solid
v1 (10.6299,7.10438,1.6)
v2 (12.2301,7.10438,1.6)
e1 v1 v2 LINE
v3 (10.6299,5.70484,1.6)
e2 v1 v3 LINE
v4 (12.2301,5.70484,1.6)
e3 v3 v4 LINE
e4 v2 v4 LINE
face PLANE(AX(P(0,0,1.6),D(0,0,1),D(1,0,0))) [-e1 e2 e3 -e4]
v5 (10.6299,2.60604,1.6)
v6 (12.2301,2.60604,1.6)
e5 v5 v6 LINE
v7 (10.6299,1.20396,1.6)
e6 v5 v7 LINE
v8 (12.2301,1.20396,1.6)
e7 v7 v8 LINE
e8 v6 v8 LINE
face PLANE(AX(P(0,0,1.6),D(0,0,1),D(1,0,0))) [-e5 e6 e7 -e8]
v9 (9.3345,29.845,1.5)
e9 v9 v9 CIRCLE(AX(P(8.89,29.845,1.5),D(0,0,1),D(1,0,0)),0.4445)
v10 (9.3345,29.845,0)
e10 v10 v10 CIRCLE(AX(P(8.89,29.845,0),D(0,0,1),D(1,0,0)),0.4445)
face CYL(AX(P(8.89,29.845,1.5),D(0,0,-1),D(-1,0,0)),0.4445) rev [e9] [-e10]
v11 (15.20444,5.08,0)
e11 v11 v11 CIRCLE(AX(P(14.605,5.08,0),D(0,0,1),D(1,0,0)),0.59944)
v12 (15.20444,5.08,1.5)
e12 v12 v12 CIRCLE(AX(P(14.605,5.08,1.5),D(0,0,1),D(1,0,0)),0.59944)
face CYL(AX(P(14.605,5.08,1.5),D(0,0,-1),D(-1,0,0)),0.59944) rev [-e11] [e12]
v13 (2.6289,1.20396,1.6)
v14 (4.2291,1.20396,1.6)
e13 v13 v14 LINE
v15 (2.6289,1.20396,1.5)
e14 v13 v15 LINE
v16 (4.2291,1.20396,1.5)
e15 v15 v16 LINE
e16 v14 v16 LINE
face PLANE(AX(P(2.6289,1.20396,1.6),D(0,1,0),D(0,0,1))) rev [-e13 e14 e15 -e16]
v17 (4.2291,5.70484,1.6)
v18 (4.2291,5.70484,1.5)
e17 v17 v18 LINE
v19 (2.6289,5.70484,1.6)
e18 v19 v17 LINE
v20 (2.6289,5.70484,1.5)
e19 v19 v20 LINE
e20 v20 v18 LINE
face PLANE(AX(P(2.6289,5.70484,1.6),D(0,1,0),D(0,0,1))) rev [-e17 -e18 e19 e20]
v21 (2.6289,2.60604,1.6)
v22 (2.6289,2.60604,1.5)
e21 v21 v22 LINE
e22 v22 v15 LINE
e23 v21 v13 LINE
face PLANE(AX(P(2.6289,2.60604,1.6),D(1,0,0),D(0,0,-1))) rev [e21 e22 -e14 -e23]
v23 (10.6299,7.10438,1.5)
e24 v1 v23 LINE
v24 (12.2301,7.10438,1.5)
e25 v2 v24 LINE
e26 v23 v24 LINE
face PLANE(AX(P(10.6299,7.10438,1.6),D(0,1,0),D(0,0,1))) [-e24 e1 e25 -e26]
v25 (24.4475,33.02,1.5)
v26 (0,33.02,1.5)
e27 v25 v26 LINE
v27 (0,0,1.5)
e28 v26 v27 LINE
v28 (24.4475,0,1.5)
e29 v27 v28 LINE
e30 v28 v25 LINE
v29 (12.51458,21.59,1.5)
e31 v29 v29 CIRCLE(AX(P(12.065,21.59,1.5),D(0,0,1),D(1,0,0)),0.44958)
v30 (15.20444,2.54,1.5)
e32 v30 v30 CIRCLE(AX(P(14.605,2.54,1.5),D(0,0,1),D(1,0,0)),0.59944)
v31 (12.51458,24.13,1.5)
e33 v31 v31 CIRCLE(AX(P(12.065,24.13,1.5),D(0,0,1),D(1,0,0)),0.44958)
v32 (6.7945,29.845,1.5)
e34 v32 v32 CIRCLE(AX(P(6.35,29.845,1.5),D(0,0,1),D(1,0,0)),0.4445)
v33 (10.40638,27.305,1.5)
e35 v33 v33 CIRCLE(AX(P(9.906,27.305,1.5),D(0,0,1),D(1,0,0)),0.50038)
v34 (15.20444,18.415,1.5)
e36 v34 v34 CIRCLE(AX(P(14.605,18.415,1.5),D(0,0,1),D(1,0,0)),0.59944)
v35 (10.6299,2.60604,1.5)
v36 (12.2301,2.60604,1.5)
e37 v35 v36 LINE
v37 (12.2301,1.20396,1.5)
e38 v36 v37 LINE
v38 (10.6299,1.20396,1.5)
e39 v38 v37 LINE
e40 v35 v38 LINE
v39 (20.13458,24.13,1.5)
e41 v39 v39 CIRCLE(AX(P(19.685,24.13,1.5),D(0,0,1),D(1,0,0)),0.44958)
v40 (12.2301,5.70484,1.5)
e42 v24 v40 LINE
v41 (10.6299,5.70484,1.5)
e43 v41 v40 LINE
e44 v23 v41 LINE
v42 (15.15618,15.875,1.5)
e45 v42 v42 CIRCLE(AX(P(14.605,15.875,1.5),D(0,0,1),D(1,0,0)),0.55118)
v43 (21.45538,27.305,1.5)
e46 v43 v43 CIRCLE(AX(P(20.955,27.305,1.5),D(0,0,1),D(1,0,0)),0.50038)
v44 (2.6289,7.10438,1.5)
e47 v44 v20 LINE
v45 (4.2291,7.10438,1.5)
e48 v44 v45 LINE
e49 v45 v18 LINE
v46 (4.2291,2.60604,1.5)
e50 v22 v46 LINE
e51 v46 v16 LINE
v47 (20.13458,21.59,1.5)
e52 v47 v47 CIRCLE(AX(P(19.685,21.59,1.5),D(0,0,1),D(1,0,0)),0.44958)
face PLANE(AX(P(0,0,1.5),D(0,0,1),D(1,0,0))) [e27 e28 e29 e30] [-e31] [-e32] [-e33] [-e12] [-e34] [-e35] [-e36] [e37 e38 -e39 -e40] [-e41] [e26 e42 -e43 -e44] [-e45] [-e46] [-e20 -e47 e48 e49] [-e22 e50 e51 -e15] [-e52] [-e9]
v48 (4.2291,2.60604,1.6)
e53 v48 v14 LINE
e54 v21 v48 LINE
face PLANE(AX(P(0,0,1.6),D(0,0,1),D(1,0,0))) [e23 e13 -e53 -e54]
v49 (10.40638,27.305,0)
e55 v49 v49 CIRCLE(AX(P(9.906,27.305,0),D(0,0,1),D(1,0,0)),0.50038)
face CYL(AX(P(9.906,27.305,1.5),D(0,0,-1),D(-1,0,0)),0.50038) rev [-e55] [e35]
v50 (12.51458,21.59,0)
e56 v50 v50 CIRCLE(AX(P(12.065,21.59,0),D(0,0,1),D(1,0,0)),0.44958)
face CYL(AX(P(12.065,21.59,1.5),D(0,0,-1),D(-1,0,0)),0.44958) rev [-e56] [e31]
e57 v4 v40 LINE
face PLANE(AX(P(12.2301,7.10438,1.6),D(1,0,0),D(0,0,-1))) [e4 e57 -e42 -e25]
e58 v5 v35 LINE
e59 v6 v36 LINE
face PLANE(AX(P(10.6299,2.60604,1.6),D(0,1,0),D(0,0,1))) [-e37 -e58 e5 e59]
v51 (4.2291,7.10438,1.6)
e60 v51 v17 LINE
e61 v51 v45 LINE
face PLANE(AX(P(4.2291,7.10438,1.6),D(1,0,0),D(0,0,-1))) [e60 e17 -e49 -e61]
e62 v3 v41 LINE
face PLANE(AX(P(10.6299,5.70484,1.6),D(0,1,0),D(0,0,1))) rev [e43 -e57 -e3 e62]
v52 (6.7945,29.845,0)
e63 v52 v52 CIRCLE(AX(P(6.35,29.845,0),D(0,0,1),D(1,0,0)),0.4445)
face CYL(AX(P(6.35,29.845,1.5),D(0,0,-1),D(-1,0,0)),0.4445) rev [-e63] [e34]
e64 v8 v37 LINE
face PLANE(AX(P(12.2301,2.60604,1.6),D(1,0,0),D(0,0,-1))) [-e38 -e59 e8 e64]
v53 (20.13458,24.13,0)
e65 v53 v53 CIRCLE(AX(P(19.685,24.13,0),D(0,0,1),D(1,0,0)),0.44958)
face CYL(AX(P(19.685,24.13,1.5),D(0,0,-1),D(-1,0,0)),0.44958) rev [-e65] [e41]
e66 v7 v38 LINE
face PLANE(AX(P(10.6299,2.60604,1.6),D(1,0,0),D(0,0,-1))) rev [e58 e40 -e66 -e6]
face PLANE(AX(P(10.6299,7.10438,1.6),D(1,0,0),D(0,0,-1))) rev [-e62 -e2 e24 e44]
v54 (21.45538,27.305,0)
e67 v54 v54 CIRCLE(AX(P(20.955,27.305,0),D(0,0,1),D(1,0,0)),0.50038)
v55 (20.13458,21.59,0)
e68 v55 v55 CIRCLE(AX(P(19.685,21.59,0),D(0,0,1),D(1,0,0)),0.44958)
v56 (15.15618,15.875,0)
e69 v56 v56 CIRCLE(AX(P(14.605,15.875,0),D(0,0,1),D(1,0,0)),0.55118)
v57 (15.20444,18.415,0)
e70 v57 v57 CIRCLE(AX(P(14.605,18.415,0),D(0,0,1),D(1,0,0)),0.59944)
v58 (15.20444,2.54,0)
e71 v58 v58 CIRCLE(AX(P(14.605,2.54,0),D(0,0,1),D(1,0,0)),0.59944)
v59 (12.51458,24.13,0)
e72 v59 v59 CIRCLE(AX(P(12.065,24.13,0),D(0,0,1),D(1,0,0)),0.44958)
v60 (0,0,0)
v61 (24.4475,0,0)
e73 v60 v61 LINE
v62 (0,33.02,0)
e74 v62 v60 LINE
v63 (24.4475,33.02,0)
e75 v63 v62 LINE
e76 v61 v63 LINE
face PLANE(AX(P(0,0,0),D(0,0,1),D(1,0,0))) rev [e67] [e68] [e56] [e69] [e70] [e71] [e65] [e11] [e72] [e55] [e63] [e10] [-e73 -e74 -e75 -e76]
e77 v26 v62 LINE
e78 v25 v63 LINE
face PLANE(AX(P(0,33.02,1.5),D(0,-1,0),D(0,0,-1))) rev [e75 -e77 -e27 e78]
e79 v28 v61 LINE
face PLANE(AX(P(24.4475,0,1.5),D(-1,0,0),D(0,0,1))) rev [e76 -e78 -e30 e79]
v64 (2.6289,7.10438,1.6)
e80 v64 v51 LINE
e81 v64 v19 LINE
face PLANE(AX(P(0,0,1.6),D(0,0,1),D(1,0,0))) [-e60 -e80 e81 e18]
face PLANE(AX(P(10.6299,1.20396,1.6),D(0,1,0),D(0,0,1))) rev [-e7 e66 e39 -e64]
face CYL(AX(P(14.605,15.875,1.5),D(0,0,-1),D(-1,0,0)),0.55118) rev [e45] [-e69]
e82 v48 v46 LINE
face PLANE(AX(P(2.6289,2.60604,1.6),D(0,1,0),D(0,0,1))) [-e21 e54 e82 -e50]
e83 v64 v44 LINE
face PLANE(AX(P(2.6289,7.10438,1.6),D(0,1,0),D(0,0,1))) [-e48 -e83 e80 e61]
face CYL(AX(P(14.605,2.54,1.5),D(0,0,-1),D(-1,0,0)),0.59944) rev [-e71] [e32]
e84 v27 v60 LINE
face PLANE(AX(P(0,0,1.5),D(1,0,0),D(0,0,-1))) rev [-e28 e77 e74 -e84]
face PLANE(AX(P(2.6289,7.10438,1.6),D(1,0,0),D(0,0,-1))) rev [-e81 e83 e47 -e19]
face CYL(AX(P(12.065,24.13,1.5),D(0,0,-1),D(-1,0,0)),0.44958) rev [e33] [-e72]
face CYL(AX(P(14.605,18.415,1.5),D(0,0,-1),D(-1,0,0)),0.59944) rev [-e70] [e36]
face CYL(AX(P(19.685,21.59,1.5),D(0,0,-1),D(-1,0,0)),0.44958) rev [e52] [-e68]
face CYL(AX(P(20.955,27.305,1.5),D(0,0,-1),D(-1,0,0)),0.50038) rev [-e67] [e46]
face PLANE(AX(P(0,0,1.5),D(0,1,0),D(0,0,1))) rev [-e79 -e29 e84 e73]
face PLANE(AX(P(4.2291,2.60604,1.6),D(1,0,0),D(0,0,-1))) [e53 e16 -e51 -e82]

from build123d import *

# Parameters (mm, degrees)
SKETCH_1_W            = 24.4475
SKETCH_1_H            = 33.02
SKETCH_1_R            = 0.44958
SKETCH_1_R_2          = 0.55118
SKETCH_1_R_3          = 0.59944
SKETCH_1_R_4          = 0.50038
SKETCH_1_R_5          = 0.4445
EXTRUDE_1_DEPTH       = 1.5
EXTRUDE_2_OUTLINE_W   = 1.6002
EXTRUDE_2_OUTLINE_H   = 1.40208
EXTRUDE_2_OUTLINE_H_2 = 1.39954
EXTRUDE_2_DEPTH       = 0.1


# Read off the part's stored shape, not the designer's step: Бобышка-Вытянуть2
with BuildPart() as part:
    # Эскиз1 → Бобышка-Вытянуть1 (new body)
    with BuildSketch(Plane.XY):
        with Locations((12.22375, 16.51)):
            Rectangle(SKETCH_1_W, SKETCH_1_H)
        with Locations((19.685, 21.59)):
            Circle(SKETCH_1_R, mode=Mode.SUBTRACT)
        with Locations((19.685, 24.13)):
            Circle(SKETCH_1_R, mode=Mode.SUBTRACT)
        with Locations((12.065, 24.13)):
            Circle(SKETCH_1_R, mode=Mode.SUBTRACT)
        with Locations((12.065, 21.59)):
            Circle(SKETCH_1_R, mode=Mode.SUBTRACT)
        with Locations((14.605, 15.875)):
            Circle(SKETCH_1_R_2, mode=Mode.SUBTRACT)
        with Locations((14.605, 18.415)):
            Circle(SKETCH_1_R_3, mode=Mode.SUBTRACT)
        with Locations((14.605, 2.54)):
            Circle(SKETCH_1_R_3, mode=Mode.SUBTRACT)
        with Locations((14.605, 5.08)):
            Circle(SKETCH_1_R_3, mode=Mode.SUBTRACT)
        with Locations((9.906, 27.305)):
            Circle(SKETCH_1_R_4, mode=Mode.SUBTRACT)
        with Locations((20.955, 27.305)):
            Circle(SKETCH_1_R_4, mode=Mode.SUBTRACT)
        with Locations((8.89, 29.845)):
            Circle(SKETCH_1_R_5, mode=Mode.SUBTRACT)
        with Locations((6.35, 29.845)):
            Circle(SKETCH_1_R_5, mode=Mode.SUBTRACT)
    extrude(amount=EXTRUDE_1_DEPTH)

    # Бобышка-Вытянуть2 outline → Бобышка-Вытянуть2 (add)
    with BuildSketch(Plane.XY.offset(1.5)):
        with Locations((3.429, 1.905)):
            Rectangle(EXTRUDE_2_OUTLINE_W, EXTRUDE_2_OUTLINE_H)
        with Locations((3.429, 6.40461)):
            Rectangle(EXTRUDE_2_OUTLINE_W, EXTRUDE_2_OUTLINE_H_2)
        with Locations((11.43, 1.905)):
            Rectangle(EXTRUDE_2_OUTLINE_W, EXTRUDE_2_OUTLINE_H)
        with Locations((11.43, 6.40461)):
            Rectangle(EXTRUDE_2_OUTLINE_W, EXTRUDE_2_OUTLINE_H_2)
    extrude(amount=EXTRUDE_2_DEPTH)


solid = part.part
